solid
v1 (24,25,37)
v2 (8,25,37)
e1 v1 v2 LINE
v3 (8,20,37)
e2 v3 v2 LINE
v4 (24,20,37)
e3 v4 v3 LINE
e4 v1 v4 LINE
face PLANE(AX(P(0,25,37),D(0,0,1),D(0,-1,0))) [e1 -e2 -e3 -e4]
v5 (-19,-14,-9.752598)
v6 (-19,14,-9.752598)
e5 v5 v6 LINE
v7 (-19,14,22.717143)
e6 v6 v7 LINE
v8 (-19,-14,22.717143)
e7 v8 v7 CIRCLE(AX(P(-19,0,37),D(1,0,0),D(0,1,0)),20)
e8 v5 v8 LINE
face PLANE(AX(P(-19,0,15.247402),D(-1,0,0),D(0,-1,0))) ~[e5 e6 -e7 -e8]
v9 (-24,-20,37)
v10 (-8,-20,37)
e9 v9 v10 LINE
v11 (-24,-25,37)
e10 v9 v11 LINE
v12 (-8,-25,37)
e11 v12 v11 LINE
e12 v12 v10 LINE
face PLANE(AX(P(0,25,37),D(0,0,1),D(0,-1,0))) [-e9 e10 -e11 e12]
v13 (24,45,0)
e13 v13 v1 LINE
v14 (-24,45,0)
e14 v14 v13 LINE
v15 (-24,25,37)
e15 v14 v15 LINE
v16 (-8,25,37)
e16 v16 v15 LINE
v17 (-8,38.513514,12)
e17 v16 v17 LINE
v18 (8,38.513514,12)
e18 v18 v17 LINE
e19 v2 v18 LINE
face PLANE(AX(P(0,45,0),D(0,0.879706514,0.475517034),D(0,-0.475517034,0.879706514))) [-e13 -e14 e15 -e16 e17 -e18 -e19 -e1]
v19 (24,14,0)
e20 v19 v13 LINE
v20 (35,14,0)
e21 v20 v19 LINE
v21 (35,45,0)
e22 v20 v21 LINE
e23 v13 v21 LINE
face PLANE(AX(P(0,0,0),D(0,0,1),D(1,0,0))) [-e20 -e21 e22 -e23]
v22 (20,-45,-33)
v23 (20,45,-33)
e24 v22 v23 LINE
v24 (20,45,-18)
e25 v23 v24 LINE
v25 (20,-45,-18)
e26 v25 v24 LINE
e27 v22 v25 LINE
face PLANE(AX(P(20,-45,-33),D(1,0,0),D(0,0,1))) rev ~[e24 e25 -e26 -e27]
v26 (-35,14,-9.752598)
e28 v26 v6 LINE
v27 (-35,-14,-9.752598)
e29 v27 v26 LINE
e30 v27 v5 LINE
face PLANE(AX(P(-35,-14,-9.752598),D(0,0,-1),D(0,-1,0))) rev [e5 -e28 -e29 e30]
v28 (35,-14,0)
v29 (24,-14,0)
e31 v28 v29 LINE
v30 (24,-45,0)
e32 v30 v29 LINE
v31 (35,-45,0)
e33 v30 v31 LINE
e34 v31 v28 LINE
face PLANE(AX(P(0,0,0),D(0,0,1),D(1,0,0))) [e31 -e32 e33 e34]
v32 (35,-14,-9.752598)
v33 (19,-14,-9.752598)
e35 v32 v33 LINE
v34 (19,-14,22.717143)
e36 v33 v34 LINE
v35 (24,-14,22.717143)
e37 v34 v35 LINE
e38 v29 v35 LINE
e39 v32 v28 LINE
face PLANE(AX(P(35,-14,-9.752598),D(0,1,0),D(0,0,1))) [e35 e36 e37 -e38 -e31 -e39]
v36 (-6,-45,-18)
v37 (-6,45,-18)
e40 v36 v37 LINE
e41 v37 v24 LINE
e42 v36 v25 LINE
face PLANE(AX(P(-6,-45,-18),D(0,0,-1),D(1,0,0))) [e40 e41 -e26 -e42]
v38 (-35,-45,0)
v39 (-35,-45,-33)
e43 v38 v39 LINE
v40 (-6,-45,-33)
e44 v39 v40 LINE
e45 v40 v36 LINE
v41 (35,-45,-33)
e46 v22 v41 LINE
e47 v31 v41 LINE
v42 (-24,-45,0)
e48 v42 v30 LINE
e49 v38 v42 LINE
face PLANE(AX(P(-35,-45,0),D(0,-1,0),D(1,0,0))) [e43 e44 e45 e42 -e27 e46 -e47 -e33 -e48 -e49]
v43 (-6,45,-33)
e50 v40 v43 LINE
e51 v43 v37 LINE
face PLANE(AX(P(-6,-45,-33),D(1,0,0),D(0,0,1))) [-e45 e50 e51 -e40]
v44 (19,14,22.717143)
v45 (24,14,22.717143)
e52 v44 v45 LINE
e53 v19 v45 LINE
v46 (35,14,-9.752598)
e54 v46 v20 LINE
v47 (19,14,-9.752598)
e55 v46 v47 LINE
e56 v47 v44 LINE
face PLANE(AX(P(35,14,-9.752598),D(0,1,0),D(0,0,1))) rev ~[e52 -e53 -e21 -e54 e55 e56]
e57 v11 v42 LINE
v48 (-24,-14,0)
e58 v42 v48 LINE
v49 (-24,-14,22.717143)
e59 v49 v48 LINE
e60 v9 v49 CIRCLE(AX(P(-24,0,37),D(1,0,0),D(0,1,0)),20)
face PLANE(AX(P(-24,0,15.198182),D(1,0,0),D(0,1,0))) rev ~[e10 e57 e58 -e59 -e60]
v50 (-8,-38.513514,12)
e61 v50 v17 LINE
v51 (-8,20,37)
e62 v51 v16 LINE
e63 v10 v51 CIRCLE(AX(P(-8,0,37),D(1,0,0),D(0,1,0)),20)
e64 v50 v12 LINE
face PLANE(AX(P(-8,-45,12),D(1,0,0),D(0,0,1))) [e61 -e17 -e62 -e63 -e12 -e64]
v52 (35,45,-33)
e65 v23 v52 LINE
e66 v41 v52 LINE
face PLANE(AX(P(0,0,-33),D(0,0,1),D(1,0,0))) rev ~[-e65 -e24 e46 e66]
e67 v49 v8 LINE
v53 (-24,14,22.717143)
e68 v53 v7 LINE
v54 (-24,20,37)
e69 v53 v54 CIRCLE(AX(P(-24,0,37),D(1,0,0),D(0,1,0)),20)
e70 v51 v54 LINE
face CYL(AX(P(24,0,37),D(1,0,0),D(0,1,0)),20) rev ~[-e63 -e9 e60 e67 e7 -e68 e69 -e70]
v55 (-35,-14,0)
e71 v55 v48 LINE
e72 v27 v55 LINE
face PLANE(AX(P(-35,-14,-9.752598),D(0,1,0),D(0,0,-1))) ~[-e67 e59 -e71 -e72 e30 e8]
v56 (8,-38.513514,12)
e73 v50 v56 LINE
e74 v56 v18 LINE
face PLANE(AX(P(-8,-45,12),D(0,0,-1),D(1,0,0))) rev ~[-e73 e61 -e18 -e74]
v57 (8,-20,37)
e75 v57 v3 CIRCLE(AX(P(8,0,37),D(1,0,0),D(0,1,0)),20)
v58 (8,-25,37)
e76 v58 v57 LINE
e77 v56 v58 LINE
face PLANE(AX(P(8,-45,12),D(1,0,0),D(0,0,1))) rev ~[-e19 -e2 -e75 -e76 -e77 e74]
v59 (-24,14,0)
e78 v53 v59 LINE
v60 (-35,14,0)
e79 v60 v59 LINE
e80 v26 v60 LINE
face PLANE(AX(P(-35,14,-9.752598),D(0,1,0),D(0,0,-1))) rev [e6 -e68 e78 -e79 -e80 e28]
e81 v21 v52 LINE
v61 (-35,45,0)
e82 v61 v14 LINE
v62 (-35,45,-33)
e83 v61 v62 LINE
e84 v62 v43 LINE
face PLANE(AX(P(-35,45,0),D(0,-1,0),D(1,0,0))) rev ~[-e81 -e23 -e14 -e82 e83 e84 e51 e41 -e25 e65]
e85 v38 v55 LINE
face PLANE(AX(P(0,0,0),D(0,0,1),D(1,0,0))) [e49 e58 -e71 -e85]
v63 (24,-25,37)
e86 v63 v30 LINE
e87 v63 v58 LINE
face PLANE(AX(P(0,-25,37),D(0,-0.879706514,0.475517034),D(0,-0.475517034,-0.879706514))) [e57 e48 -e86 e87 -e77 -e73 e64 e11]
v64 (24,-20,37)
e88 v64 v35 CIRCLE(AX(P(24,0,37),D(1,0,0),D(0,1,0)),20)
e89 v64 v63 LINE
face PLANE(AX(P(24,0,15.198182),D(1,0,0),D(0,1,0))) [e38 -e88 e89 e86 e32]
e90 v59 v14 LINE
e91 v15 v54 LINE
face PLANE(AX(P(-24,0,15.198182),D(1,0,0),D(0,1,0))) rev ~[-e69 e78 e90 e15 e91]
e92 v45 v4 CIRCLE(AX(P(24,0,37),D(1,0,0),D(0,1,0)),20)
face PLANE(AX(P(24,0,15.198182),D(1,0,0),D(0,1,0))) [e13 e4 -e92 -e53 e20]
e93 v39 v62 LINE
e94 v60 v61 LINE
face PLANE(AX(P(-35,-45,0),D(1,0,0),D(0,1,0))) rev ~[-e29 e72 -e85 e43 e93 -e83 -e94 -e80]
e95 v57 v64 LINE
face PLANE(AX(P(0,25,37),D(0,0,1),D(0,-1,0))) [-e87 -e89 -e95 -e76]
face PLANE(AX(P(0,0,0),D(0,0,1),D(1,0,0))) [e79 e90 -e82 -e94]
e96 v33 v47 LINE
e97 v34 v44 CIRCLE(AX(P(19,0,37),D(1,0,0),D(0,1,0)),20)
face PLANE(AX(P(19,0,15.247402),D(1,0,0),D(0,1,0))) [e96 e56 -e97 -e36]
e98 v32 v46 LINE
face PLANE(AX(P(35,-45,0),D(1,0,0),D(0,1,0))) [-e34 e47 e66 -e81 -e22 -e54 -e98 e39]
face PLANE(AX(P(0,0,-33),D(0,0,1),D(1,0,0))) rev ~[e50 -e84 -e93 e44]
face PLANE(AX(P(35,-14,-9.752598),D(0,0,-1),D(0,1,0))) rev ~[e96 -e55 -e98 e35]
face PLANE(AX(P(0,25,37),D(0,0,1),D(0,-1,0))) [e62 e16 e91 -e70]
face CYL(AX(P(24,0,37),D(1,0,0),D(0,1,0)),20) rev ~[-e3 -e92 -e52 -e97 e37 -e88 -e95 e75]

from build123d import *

# Parameters (mm, degrees)
F1_W      = 70
F1_H      = 90
F2_DEPTH  = 33
F3_W      = 26
F3_H      = 15
F4_DEPTH  = 90.001
F5_DEPTH  = 24
F6_W      = 16
F6_H      = 25
F7_DEPTH  = 90.001
F8_R      = 20
F9_DEPTH  = 59.001
F10_W     = 28
F10_H     = 50
F11_DEPTH = 16


# Not quite as in the source:
# - a pattern or mirror of a feature is missing from the dataset's text; its kind, count and spacing are read off the source's solid


with BuildPart() as f2:
    # F1 (on Top) → F2 (new body)
    with BuildSketch(Plane.XY):
        Rectangle(F1_W, F1_H)
    extrude(amount=-F2_DEPTH)

    # F3 (on face) → F4 (cut, through all)
    with BuildSketch(Plane.XZ.offset(45)):
        with Locations((7, -25.5)):
            Rectangle(F3_W, F3_H)
    extrude(amount=-F4_DEPTH, mode=Mode.SUBTRACT)

    # F0 (on Right) → F5 (join, symmetric)
    with BuildSketch(Plane.YZ):
        Polygon((-25, 37), (-45, 0), (45, 0), (25, 37), align=None)
    extrude(amount=F5_DEPTH, both=True)

    # F6 (on face) → F7 (cut, through all)
    with BuildSketch(Plane.XZ.offset(45)):
        with Locations((0, 24.5)):
            Rectangle(F6_W, F6_H)
    extrude(amount=-F7_DEPTH, mode=Mode.SUBTRACT)

    # F8 (on face) → F9 (cut, through all)
    with BuildSketch(Plane.YZ.offset(24)):
        with Locations((0, 37)):
            Circle(F8_R)
    extrude(amount=-F9_DEPTH, mode=Mode.SUBTRACT)

    # F10 (on face) → F11 (cut)
    with BuildSketch(Plane.YZ.offset(35)):
        with Locations((0, 15.2474023402)):
            Rectangle(F10_W, F10_H)
    f11 = extrude(amount=-F11_DEPTH, mode=Mode.SUBTRACT)

    # F11_copies: F11 across plane
    add(f11.mirror(Plane(origin=(0, 0, 0), x_dir=(0, 0, -1), z_dir=(-1, 0, 0))), mode=Mode.SUBTRACT)


solid = f2.part
